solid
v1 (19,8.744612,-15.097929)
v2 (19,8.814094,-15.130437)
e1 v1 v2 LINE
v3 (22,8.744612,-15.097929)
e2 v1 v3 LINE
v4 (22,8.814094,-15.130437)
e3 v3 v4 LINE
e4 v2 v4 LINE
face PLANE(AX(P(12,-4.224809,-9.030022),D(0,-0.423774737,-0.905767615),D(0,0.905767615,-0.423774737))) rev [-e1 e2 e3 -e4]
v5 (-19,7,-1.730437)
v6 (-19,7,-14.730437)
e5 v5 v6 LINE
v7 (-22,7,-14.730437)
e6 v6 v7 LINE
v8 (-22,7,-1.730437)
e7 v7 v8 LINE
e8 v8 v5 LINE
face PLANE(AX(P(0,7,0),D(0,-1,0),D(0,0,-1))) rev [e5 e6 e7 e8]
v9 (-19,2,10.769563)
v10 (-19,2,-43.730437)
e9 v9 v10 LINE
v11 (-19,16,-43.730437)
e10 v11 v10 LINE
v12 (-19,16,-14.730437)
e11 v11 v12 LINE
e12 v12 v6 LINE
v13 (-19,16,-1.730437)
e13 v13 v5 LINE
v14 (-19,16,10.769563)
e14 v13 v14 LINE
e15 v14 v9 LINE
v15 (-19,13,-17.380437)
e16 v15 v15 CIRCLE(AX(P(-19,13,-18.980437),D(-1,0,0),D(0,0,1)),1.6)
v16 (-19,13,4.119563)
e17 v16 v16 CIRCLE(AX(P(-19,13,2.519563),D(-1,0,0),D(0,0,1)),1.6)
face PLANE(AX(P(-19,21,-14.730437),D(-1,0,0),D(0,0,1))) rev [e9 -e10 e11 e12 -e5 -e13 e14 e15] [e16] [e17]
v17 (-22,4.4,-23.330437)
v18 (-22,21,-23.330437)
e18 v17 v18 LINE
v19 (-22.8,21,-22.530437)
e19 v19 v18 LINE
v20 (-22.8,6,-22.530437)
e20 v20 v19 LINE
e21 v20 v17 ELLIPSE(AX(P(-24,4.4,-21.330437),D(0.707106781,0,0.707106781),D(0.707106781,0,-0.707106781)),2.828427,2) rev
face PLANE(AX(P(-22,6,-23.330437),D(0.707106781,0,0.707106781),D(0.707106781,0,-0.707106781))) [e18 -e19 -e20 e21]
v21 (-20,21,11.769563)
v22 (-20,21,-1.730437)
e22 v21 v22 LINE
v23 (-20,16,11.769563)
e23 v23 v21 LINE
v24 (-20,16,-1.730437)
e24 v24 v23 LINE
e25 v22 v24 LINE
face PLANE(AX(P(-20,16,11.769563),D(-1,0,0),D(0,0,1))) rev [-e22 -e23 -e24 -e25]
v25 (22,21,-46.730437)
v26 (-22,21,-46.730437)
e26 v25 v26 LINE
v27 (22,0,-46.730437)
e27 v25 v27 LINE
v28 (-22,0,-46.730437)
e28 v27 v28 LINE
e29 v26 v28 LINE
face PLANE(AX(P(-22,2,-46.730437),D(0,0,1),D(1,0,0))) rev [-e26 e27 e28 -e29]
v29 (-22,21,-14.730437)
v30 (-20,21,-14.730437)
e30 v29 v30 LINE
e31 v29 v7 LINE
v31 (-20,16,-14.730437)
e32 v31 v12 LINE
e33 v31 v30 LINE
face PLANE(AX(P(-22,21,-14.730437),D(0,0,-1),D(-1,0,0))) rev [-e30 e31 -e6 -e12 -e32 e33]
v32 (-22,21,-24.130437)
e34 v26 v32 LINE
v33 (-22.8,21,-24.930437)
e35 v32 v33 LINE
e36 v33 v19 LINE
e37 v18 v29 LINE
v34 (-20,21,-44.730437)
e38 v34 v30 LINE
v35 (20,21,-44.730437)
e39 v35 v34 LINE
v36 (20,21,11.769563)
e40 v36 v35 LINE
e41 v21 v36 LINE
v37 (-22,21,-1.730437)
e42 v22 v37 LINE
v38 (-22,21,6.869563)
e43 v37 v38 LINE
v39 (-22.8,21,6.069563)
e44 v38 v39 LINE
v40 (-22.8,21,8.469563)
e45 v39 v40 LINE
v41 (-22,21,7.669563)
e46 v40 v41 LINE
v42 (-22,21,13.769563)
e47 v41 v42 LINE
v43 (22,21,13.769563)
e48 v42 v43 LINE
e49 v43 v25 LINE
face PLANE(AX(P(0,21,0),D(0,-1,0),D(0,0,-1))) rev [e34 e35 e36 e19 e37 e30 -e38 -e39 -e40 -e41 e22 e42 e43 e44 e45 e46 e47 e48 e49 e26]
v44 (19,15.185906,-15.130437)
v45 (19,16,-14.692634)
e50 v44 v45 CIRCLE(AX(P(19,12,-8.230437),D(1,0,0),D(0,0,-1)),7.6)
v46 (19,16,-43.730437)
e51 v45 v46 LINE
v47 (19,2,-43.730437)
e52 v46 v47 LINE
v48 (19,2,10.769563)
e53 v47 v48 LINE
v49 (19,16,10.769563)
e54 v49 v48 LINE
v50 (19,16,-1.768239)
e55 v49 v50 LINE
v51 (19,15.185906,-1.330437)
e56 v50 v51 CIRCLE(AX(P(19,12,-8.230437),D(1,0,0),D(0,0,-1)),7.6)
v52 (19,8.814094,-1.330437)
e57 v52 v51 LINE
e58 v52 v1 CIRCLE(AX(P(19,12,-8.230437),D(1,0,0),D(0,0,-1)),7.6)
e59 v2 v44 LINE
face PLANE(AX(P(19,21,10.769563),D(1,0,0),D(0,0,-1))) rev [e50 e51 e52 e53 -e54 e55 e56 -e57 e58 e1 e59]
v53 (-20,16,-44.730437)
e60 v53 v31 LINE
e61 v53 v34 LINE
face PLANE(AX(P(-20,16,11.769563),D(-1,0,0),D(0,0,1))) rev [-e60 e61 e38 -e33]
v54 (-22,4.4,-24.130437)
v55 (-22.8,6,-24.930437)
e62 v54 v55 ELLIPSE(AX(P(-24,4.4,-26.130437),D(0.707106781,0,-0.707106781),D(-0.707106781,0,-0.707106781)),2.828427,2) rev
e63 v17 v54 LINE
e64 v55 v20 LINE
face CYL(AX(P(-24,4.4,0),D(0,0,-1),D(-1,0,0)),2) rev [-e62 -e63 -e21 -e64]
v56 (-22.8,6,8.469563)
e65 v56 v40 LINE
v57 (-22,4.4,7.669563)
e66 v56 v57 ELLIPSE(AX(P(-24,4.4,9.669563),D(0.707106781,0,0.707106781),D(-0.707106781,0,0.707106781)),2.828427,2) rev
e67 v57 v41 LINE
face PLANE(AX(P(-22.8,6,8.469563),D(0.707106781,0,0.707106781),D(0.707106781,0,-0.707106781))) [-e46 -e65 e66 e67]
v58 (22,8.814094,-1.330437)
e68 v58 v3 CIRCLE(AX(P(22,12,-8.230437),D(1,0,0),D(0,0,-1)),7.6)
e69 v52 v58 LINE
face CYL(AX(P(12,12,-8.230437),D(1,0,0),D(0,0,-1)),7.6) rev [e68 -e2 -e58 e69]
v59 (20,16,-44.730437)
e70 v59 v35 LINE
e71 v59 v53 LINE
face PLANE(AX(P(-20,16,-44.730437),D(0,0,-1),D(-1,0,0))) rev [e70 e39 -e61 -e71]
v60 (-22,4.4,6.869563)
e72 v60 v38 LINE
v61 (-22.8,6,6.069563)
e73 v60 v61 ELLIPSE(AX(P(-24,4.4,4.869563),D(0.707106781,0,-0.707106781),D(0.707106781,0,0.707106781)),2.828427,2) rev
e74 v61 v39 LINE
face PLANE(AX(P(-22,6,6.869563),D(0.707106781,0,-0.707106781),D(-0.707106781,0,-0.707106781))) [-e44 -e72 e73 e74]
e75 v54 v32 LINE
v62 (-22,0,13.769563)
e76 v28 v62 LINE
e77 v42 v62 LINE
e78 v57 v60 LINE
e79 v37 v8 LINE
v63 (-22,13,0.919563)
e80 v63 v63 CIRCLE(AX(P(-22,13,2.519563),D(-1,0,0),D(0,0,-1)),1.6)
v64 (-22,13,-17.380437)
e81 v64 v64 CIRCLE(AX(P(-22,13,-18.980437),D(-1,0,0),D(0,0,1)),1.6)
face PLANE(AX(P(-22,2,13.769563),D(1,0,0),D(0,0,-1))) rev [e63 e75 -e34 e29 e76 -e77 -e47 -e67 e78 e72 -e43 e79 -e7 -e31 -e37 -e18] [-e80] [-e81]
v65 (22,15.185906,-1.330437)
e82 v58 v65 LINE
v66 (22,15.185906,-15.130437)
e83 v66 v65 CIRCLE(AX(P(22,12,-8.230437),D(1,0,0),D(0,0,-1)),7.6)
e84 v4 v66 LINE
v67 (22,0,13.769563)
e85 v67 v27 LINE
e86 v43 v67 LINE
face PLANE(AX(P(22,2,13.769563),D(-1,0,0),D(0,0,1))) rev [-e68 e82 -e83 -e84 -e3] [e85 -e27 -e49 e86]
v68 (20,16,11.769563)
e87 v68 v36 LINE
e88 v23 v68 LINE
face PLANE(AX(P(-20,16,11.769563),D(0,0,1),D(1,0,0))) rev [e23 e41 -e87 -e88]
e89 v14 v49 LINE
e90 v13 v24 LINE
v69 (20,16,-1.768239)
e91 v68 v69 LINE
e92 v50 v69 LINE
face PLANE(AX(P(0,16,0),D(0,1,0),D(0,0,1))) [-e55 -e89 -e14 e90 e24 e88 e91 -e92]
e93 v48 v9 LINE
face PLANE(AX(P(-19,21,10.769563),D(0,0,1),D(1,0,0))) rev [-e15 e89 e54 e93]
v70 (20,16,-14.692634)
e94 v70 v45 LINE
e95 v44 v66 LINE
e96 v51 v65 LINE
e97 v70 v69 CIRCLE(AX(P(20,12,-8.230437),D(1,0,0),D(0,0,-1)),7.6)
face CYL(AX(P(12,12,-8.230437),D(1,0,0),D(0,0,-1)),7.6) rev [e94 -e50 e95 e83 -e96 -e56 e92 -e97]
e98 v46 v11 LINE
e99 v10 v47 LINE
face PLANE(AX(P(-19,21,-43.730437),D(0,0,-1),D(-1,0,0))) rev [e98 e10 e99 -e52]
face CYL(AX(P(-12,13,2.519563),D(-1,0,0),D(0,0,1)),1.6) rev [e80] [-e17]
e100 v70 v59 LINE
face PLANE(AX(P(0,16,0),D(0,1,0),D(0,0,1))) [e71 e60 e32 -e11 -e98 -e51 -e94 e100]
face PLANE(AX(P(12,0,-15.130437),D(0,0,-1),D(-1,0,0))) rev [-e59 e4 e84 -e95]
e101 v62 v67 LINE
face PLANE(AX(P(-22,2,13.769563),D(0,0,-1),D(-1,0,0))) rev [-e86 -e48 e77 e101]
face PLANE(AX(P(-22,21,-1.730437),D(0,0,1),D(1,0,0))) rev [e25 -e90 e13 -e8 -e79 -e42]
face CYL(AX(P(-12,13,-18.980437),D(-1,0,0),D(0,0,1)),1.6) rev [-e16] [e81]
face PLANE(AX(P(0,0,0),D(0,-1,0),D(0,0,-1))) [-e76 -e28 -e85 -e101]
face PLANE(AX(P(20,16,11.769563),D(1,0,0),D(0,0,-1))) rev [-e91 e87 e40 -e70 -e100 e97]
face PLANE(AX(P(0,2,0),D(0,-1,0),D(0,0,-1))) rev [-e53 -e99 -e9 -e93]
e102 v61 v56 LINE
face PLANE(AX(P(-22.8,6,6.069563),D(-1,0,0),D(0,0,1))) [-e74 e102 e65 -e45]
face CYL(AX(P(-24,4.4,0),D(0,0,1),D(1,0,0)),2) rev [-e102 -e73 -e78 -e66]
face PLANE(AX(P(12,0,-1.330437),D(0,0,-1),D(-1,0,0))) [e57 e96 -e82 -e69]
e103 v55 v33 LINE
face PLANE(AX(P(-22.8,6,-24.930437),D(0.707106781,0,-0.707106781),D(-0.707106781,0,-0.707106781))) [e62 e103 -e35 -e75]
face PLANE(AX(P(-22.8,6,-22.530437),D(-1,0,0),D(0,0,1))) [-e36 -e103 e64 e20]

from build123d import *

# Parameters (mm, degrees)
CROQUIS3_W              = 44
CROQUIS3_H              = 60.5
SALIENTE_EXTRUIR1_DEPTH = 2
SALIENTE_EXTRUIR2_DEPTH = 19
CROQUIS5_W              = 3
CROQUIS5_H              = 13
SALIENTE_EXTRUIR3_DEPTH = 5
CROQUIS6_W              = 40
CROQUIS6_H              = 56.5
CROQUIS6_W_2            = 38
CROQUIS6_H_2            = 54.5
CORTAR_EXTRUIR1_DEPTH   = 5
SALIENTE_EXTRUIR4_DEPTH = 15
REDONDEO1_R             = 2
CORTAR_EXTRUIR4_DEPTH   = 10
CROQUIS9_R              = 1.6
CORTAR_EXTRUIR5_DEPTH   = 10


with BuildPart() as part:
    # Croquis3 → Saliente-Extruir1 (new body)
    with BuildSketch(Plane(origin=(0, 0, 0), x_dir=(1, 0, 0), z_dir=(0, 1, 0))):
        with Locations((0, 16.480436564)):
            Rectangle(CROQUIS3_W, CROQUIS3_H)
    extrude(amount=SALIENTE_EXTRUIR1_DEPTH)

    # Croquis4 → Saliente-Extruir2 (add)
    with BuildSketch(Plane(origin=(0, 2, 0), x_dir=(1, 0, 0), z_dir=(0, 1, 0))):
        Polygon((-22, -13.769563436), (22, -13.769563436), (22, 46.730436564), (-22, 46.730436564), (-22, 14.730436564), (-19, 14.730436564), (-19, 43.730436564), (19, 43.730436564), (19, -10.769563436), (-19, -10.769563436), (-19, 1.730436564), (-22, 1.730436564), align=None)
    extrude(amount=SALIENTE_EXTRUIR2_DEPTH)

    # Croquis5 → Saliente-Extruir3 (add)
    with BuildSketch(Plane(origin=(0, 2, 0), x_dir=(1, 0, 0), z_dir=(0, 1, 0))):
        with Locations((-20.5, 8.230436564)):
            Rectangle(CROQUIS5_W, CROQUIS5_H)
    extrude(amount=SALIENTE_EXTRUIR3_DEPTH)

    # Croquis6 → Cortar-Extruir1 (cut)
    with BuildSketch(Plane(origin=(0, 21, 0), x_dir=(1, 0, 0), z_dir=(0, 1, 0))):
        with Locations((0, 16.480436564)):
            Rectangle(CROQUIS6_W, CROQUIS6_H)
        with Locations((0, 16.480436564)):
            Rectangle(CROQUIS6_W_2, CROQUIS6_H_2, mode=Mode.SUBTRACT)
    extrude(amount=-CORTAR_EXTRUIR1_DEPTH, mode=Mode.SUBTRACT)

    # Croquis7 → Saliente-Extruir4 (add)
    with BuildSketch(Plane(origin=(0, 21, 0), x_dir=(1, 0, 0), z_dir=(0, 1, 0))):
        Polygon((-22, -7.269563436), (-22, -6.869563436), (-22.8, -6.069563436), (-22.8, -8.469563436), (-22, -7.669563436), align=None)
        Polygon((-22, 24.130436564), (-22, 23.730436564), (-22, 23.330436564), (-22.8, 22.530436564), (-22.8, 24.930436564), align=None)
    extrude(amount=-SALIENTE_EXTRUIR4_DEPTH)

    # Redondeo1
    # the kernel refuses this fillet: 2 mm, written as the material it adds along each edge
    with BuildSketch(Plane(origin=(-22, 6, 11.669563436), x_dir=(0, -1, 0), z_dir=(0, 0, -1))) as redondeo1_piece_1_section:
        with BuildLine():
            CenterArc((1.6, 2), REDONDEO1_R, 216.869897646, 53.130102354)
            Line((0, 0.8), (-0.032, 0.776))
            ThreePointArc((-0.032, 0.776), (-0.04, 0.4), (-0.04, 0))
            Line((-0.04, 0), (0, -0.04))
            Line((0, -0.04), (1.6, -0.04))
            Line((1.6, -0.04), (1.6, 0))
        make_face()
    redondeo1_piece_1 = extrude(amount=8.8, mode=Mode.PRIVATE)
    redondeo1_piece_1 = split(redondeo1_piece_1, bisect_by=Plane(origin=(-21.934112323, 5.657693128, 7.603675758), z_dir=(-0.7071067811865467, 0, -0.7071067811865483)), keep=Keep.TOP, mode=Mode.PRIVATE)
    redondeo1_piece_1 = split(redondeo1_piece_1, bisect_by=Plane(origin=(-21.934112323, 5.657693128, 6.935451113), z_dir=(-0.7071067811865467, 0, 0.7071067811865483)), keep=Keep.TOP, mode=Mode.PRIVATE)
    add(redondeo1_piece_1)
    with BuildSketch(Plane(origin=(-22, 6, -19.330436564), x_dir=(0, -1, 0), z_dir=(0, 0, -1))) as redondeo1_piece_2_section:
        with BuildLine():
            CenterArc((1.6, 2), REDONDEO1_R, 216.869897646, 53.130102354)
            Line((0, 0.8), (-0.032, 0.776))
            ThreePointArc((-0.032, 0.776), (-0.04, 0.4), (-0.04, 0))
            Line((-0.04, 0), (0, -0.04))
            Line((0, -0.04), (1.6, -0.04))
            Line((1.6, -0.04), (1.6, 0))
        make_face()
    redondeo1_piece_2 = extrude(amount=8.8, mode=Mode.PRIVATE)
    redondeo1_piece_2 = split(redondeo1_piece_2, bisect_by=Plane(origin=(-21.934112323, 5.657693128, -23.396324242), z_dir=(-0.707106781186546, 0, -0.7071067811865491)), keep=Keep.TOP, mode=Mode.PRIVATE)
    redondeo1_piece_2 = split(redondeo1_piece_2, bisect_by=Plane(origin=(-21.934112323, 5.657693128, -24.064548887), z_dir=(-0.7071067811865476, 0, 0.7071067811865476)), keep=Keep.TOP, mode=Mode.PRIVATE)
    add(redondeo1_piece_2)

    # Croquis8 → Cortar-Extruir4 (cut)
    with BuildSketch(Plane(origin=(22, 0, 0), x_dir=(0, 0, -1), z_dir=(1, 0, 0))):
        with BuildLine():
            Line((15.097928983, 8.744612484), (15.130436564, 8.814093536))
            Line((15.130436564, 8.814093536), (15.130436564, 15.185906464))
            ThreePointArc((15.130436564, 15.185906464), (8.230436564, 19.6), (1.330436564, 15.185906464))
            Line((1.330436564, 15.185906464), (1.330436564, 8.814093536))
            ThreePointArc((1.330436564, 8.814093536), (8.192081775, 4.400096783), (15.097928983, 8.744612484))
        make_face()
    extrude(amount=-CORTAR_EXTRUIR4_DEPTH, mode=Mode.SUBTRACT)

    # Croquis9 → Cortar-Extruir5 (cut)
    with BuildSketch(Plane.ZY.offset(22)):
        with Locations((-18.980436564, 13)):
            Circle(CROQUIS9_R)
        with Locations((2.519563436, 13)):
            Circle(CROQUIS9_R)
    extrude(amount=-CORTAR_EXTRUIR5_DEPTH, mode=Mode.SUBTRACT)


solid = part.part
